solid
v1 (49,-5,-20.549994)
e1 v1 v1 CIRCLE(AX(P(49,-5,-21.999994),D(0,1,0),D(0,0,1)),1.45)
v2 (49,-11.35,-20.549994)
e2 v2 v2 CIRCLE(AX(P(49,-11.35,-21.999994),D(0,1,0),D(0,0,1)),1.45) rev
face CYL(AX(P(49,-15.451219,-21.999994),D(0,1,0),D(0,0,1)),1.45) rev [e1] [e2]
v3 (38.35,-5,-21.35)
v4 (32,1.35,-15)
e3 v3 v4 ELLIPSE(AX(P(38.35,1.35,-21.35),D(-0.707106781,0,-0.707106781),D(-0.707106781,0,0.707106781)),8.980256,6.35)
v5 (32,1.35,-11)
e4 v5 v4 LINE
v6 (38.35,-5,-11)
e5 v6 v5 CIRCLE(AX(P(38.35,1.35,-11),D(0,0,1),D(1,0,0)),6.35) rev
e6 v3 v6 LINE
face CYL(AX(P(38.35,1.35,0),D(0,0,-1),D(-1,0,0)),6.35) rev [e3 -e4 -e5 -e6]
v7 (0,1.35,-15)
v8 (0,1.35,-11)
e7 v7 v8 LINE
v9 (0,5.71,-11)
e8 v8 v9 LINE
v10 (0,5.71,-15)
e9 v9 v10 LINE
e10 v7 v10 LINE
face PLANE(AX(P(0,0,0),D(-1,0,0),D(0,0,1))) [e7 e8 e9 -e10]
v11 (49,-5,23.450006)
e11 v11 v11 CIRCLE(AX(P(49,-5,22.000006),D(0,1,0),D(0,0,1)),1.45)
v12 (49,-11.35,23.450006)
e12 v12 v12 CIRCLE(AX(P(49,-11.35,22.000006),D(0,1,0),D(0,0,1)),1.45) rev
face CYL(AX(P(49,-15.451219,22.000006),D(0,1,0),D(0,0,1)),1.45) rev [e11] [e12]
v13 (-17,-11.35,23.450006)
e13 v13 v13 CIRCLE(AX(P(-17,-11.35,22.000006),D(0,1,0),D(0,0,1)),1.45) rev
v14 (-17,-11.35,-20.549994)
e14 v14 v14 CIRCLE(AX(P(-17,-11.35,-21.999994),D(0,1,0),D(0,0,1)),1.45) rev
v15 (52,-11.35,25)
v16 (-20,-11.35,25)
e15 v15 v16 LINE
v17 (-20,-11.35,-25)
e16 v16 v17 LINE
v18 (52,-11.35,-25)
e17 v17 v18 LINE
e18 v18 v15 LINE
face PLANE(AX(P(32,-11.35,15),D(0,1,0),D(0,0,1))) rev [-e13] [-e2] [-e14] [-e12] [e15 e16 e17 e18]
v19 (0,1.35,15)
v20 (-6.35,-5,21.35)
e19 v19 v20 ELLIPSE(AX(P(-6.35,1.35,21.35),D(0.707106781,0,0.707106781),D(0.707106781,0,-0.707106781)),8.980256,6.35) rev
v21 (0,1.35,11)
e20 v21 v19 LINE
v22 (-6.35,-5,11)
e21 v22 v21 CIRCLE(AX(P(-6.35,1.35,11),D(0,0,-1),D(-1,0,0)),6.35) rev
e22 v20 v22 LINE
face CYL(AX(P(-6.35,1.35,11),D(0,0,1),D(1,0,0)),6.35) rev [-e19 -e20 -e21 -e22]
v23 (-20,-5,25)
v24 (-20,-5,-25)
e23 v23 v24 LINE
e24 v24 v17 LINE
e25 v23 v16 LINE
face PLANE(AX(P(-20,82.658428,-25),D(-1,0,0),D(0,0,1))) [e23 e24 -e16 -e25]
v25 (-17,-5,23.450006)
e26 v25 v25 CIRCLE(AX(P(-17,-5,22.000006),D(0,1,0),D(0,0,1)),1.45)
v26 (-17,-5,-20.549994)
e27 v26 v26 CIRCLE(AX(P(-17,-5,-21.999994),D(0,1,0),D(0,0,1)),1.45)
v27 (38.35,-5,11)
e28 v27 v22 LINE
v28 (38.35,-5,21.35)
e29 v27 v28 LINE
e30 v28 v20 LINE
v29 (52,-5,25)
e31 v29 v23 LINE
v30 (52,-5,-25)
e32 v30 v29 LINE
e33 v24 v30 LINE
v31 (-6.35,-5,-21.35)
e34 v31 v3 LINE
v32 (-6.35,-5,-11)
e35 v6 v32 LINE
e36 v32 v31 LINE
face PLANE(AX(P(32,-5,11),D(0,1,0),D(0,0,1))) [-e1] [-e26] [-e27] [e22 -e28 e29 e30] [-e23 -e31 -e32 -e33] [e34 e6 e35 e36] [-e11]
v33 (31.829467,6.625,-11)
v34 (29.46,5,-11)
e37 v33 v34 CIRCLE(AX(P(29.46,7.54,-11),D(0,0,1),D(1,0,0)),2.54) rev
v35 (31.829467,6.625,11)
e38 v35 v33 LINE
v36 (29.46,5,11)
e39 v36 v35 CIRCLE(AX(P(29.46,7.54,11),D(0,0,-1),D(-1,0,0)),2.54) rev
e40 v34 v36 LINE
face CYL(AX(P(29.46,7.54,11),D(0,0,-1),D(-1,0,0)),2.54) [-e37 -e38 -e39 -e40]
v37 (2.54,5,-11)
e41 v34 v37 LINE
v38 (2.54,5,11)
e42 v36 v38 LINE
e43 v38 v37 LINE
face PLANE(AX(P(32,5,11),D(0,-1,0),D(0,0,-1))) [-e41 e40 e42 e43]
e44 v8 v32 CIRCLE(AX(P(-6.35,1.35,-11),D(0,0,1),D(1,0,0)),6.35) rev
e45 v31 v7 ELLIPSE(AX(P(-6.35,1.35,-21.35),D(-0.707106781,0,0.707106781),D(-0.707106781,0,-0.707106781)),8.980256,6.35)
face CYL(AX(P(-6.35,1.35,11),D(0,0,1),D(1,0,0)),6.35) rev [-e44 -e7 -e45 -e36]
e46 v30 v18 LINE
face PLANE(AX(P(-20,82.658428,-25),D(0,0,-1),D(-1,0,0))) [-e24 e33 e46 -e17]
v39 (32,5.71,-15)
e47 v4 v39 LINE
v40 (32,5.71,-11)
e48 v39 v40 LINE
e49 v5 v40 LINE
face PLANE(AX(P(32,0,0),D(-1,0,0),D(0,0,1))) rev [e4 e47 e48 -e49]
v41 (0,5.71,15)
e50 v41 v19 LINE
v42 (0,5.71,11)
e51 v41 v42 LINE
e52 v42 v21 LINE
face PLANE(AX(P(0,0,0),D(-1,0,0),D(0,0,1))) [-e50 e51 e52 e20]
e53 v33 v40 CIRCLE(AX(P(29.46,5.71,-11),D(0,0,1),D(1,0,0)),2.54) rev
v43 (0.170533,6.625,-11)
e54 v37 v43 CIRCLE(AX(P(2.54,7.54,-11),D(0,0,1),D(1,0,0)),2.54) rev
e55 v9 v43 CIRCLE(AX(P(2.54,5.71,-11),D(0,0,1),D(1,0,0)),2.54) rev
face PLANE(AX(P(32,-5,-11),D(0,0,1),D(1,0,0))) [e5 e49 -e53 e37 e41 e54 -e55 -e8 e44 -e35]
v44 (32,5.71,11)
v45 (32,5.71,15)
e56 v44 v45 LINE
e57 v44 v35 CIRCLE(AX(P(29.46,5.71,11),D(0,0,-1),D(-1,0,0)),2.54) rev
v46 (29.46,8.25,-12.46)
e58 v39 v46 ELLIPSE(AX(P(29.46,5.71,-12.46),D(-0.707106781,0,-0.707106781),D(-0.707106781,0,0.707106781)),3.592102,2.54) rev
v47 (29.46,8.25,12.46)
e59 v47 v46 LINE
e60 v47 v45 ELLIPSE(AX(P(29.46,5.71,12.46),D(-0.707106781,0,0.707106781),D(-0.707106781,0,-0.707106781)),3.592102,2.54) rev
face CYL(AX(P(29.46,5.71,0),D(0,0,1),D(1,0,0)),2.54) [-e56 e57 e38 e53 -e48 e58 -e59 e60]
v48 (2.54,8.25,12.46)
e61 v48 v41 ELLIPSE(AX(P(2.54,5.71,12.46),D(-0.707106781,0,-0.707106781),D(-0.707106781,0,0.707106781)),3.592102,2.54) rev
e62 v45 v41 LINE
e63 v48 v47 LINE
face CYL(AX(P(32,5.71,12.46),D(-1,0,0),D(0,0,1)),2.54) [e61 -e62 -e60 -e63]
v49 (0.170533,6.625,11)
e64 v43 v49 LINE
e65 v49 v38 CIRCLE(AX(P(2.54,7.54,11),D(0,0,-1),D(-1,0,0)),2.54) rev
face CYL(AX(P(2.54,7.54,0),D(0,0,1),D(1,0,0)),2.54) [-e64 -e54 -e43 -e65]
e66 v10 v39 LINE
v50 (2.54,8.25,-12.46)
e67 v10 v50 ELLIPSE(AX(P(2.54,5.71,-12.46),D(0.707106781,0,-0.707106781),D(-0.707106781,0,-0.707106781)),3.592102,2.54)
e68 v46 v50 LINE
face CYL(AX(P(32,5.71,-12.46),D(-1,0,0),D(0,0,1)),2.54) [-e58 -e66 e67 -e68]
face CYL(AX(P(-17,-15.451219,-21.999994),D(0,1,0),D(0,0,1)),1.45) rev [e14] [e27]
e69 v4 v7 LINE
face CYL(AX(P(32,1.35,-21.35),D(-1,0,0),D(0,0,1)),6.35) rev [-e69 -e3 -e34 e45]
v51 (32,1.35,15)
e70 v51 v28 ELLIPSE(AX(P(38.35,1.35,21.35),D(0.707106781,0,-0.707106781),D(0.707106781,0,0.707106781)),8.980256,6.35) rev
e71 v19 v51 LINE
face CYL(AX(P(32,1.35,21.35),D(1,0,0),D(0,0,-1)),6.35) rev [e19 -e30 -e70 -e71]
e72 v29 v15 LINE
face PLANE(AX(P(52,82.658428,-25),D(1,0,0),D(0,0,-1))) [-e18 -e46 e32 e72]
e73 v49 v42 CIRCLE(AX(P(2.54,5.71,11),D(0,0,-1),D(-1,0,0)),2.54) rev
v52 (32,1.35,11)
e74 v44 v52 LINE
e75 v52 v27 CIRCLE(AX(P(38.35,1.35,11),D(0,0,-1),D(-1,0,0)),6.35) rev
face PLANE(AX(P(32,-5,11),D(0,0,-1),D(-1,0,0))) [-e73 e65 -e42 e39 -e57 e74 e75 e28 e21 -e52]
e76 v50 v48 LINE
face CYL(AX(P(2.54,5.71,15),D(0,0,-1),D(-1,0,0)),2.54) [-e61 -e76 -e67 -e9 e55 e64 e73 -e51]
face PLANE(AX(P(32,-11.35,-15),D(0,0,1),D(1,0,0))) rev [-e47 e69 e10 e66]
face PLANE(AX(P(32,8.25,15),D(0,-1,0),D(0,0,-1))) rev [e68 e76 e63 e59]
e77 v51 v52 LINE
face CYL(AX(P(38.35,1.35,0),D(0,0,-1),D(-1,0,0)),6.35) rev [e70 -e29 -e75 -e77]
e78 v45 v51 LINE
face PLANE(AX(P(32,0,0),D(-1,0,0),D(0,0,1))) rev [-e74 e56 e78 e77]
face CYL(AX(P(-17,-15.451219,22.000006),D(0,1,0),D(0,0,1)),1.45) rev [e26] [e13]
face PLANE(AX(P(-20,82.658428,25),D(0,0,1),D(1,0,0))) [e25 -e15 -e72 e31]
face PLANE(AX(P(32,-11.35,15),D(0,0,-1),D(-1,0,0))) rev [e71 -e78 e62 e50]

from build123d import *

# Parameters (mm, degrees)
SKETCH2_W            = 30
SKETCH2_H            = 19.6
SKETCH2_W_2          = 22
SKETCH2_H_2          = 10
BOSS_EXTRUDE2_DEPTH  = 32
SKETCH3_W            = 72
SKETCH3_H            = 50
BOSS_EXTRUDE3_DEPTH  = 6.35
SKETCH4_R            = 1.45
CUT_EXTRUDE1_DEPTH   = 6.35
LPATTERN1_COUNT      = 2
LPATTERN1_PITCH      = 66.000000014
LPATTERN1_COUNT_DIR2 = 2
LPATTERN1_PITCH_DIR2 = 44.000000072
FILLET1_R            = 6.35
FILLET2_R            = 2.54
FILLET3_R            = 2.54


with BuildPart() as part:
    # Sketch2 → Boss-Extrude2 (new body)
    with BuildSketch(Plane(origin=(0, 0, 0), x_dir=(0, 0, -1), z_dir=(1, 0, 0))):
        with Locations((0, -1.55)):
            Rectangle(SKETCH2_W, SKETCH2_H)
        Rectangle(SKETCH2_W_2, SKETCH2_H_2, mode=Mode.SUBTRACT)
    extrude(amount=BOSS_EXTRUDE2_DEPTH)

    # Sketch3 → Boss-Extrude3 (add)
    with BuildSketch(Plane.XZ.offset(11.35)):
        with Locations((16, 0)):
            Rectangle(SKETCH3_W, SKETCH3_H)
    extrude(amount=-BOSS_EXTRUDE3_DEPTH)

    # Sketch4 → Cut-Extrude1 (cut)
    with BuildSketch(Plane(origin=(0, -5, 0), x_dir=(1, 0, 0), z_dir=(0, 1, 0))):
        with Locations(Location((-17, -22.000006, 0), (0, 0, 270))):
            Circle(SKETCH4_R)
    cut_extrude1 = extrude(amount=-CUT_EXTRUDE1_DEPTH, mode=Mode.SUBTRACT)

    # LPattern1: Cut-Extrude1 2 × 2
    with Locations(*[(i * LPATTERN1_PITCH, 0, -j * LPATTERN1_PITCH_DIR2) for i in range(LPATTERN1_COUNT) for j in range(LPATTERN1_COUNT_DIR2) if (i, j) != (0, 0)]):
        add(cut_extrude1, mode=Mode.SUBTRACT)

    # Fillet1
    fillet1_edges = [part.edges().sort_by_distance(p)[0] for p in [
        (0, -5, 13),
        (0, -5, -13),
        (16, -5, 15),
        (32, -5, 13),
        (32, -5, -13),
        (16, -5, -15),
    ]]
    fillet(fillet1_edges, radius=FILLET1_R)

    # Fillet2
    fillet2_edges = [part.edges().sort_by_distance(p)[0] for p in [
        (0, 8.25, 0),
        (16, 8.25, 15),
        (16, 8.25, -15),
        (32, 8.25, 0),
    ]]
    fillet(fillet2_edges, radius=FILLET2_R)

    # Fillet3
    # the kernel refuses this fillet: 2.54 mm, written as the material it takes off along each edge
    with BuildSketch(Plane(origin=(0, 5, -11), x_dir=(0, 1, 0), z_dir=(0, 0, 1))) as fillet3_piece_1:
        with BuildLine():
            CenterArc((FILLET3_R, -FILLET3_R), FILLET3_R, 90, 90)
            Line((0, -FILLET3_R), (0, 0))
            Line((0, 0), (FILLET3_R, 0))
        make_face()
    extrude(amount=22, mode=Mode.SUBTRACT)
    with BuildSketch(Plane(origin=(32, 5, -11), x_dir=(0, 1, 0), z_dir=(0, 0, 1))) as fillet3_piece_2:
        with BuildLine():
            CenterArc((FILLET3_R, FILLET3_R), FILLET3_R, 180, 90)
            Line((0, FILLET3_R), (0, 0))
            Line((0, 0), (FILLET3_R, 0))
        make_face()
    extrude(amount=22, mode=Mode.SUBTRACT)


solid = part.part
